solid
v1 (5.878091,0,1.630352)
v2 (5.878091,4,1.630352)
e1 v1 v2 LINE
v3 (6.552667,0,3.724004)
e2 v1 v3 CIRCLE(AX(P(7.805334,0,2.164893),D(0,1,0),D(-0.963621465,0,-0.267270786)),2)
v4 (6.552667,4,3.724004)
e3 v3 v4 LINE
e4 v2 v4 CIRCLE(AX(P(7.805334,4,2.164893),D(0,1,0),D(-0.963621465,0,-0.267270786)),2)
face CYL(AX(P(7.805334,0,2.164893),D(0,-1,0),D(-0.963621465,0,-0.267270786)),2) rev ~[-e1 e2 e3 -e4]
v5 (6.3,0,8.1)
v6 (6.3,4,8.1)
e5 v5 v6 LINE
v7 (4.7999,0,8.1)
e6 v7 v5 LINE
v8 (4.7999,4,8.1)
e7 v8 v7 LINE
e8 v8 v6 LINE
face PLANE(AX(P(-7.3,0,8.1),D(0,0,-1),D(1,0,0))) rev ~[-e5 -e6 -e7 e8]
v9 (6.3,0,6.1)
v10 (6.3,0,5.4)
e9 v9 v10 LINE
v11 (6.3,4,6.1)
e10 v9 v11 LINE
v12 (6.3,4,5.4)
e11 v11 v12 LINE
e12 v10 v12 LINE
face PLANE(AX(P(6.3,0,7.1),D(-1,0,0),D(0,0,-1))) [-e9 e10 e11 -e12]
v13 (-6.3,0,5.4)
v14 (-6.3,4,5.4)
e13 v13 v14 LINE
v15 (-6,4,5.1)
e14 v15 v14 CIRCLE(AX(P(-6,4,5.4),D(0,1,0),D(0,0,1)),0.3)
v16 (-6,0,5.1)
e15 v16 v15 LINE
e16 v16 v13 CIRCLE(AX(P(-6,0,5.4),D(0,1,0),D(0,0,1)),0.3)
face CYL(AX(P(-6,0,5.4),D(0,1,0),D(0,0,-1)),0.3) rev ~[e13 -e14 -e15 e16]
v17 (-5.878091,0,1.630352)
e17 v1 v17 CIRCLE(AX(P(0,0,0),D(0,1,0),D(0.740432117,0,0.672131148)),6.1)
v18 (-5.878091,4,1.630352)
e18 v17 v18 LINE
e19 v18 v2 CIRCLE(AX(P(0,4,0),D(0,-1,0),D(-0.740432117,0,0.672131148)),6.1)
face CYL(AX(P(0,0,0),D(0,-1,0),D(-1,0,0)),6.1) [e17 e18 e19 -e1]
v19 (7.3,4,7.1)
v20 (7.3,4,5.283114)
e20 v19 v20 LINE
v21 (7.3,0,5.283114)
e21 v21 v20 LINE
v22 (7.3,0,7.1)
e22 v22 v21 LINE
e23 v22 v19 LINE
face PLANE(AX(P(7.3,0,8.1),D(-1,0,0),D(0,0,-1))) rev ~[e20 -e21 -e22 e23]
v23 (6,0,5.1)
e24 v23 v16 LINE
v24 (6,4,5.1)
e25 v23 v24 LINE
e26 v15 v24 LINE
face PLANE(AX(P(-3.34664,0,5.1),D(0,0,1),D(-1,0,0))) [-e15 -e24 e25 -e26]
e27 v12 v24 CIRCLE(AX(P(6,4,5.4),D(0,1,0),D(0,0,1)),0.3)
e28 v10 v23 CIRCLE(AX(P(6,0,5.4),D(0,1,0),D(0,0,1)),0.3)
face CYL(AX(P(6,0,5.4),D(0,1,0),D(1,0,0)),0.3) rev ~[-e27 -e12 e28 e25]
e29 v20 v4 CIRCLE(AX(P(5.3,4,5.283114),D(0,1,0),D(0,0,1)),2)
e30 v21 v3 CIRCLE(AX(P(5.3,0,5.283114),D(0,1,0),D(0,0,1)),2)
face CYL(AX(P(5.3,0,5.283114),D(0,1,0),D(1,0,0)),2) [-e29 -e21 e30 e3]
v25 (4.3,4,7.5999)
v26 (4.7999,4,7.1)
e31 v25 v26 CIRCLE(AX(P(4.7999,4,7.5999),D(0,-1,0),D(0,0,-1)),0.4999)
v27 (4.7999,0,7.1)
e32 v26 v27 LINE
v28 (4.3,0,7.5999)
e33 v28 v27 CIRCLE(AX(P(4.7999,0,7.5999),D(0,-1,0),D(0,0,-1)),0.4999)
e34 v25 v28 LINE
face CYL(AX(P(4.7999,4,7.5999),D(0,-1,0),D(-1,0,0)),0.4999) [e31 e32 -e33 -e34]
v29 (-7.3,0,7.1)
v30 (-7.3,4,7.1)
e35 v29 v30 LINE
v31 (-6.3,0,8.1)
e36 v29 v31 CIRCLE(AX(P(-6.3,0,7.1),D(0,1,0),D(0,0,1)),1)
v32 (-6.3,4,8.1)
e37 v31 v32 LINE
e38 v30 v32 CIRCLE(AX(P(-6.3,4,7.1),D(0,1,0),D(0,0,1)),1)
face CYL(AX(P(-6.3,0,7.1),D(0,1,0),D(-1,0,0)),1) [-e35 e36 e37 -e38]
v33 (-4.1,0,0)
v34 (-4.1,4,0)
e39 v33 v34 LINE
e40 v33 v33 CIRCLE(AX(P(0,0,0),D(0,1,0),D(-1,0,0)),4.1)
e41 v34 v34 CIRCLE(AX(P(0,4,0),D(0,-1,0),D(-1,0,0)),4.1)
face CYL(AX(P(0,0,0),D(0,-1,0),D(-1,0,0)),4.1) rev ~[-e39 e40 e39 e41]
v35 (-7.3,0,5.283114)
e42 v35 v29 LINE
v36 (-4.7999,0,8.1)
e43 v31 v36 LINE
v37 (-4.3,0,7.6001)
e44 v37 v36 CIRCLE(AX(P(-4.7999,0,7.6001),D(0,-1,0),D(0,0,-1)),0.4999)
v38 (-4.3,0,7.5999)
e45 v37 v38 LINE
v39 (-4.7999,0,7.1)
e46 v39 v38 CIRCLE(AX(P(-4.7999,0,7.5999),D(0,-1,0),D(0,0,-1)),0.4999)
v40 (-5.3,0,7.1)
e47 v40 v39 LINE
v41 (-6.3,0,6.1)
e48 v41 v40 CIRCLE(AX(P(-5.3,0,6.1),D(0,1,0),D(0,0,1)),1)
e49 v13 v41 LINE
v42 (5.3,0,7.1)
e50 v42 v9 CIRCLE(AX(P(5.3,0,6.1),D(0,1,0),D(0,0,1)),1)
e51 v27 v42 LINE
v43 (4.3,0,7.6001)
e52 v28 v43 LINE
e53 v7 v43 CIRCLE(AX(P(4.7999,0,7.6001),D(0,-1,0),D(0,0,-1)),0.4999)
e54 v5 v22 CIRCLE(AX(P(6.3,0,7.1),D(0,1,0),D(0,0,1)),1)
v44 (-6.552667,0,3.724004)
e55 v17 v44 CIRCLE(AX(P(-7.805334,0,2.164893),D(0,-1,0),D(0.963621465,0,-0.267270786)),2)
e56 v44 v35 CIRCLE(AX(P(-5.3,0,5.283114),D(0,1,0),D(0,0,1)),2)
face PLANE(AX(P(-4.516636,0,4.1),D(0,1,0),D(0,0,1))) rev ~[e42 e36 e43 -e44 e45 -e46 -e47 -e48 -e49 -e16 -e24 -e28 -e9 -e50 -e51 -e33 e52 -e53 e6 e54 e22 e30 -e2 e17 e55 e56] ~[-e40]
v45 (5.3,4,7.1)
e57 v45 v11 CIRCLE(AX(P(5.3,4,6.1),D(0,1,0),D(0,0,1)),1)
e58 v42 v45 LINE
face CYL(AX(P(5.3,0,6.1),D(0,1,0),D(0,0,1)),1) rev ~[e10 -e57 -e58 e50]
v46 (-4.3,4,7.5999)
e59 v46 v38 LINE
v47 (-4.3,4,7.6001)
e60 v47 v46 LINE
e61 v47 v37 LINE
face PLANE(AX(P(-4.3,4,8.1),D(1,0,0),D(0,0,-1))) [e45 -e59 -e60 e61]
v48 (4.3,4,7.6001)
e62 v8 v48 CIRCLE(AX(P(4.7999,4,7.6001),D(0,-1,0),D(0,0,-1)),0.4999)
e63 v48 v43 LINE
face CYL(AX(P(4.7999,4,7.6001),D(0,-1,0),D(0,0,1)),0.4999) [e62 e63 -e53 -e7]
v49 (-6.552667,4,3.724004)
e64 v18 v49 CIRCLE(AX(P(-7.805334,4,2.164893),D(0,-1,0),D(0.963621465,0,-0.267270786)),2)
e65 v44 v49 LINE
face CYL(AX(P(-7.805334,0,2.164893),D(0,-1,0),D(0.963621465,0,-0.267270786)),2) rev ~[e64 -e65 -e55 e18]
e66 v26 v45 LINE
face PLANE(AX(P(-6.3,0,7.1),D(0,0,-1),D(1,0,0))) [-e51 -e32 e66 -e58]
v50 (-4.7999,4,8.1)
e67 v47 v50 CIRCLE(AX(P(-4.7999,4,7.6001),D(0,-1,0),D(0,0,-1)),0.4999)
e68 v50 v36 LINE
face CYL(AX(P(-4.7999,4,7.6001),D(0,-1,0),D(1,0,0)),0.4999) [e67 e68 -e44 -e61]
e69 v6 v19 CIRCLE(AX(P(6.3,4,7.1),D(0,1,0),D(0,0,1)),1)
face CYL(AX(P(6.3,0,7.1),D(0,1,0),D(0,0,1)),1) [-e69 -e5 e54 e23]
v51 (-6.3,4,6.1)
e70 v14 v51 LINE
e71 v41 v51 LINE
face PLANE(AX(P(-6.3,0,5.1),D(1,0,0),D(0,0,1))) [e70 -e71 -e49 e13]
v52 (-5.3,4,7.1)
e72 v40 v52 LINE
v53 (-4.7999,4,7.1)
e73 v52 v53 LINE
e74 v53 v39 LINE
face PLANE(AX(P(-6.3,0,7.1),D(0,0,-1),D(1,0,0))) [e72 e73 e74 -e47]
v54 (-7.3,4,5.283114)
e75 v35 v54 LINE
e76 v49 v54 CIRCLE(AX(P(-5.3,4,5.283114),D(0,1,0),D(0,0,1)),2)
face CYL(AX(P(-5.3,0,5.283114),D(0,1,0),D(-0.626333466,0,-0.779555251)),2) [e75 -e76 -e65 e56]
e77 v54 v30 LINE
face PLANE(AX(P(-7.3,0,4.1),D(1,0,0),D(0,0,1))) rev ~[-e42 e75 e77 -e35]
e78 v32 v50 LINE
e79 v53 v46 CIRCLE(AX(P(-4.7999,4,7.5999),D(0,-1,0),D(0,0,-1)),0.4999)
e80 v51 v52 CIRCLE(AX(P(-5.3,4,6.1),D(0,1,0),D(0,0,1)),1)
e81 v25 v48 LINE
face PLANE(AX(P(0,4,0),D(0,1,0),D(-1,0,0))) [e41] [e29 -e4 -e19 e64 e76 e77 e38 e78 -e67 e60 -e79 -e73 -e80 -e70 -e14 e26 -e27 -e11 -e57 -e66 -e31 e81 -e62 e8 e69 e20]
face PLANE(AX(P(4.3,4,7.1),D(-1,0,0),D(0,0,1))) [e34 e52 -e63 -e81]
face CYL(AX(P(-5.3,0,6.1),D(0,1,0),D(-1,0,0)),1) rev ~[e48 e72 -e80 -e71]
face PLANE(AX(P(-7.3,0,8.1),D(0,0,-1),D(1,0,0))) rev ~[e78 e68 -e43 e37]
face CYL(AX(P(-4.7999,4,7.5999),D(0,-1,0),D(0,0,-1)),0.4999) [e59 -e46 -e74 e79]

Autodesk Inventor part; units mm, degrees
ref_plane "YZ Plane" through (0, 0, 0) normal (1, 0, 0) x (0, 1, 0)
ref_plane "XZ Plane" through (0, 0, 0) normal (0, 1, 0) x (-1, 0, 0)
ref_plane "XY Plane" through (0, 0, 0) normal (0, 0, 1) x (1, 0, 0)
sketch "Sketch1" plane through (0, 0, 0) normal (0, 1, 0) x (-1, 0, 0)
  circle A0 centre (0, 0) radius 4.1
  line L0 (6.3, 7.1) -> (-6.3, 7.1)
  line L1 (-6.3, 7.1) -> (-6.3, 5.1)
  line L2 (-6.3, 5.1) -> (6.3, 5.1)
  line L3 (6.3, 5.1) -> (6.3, 7.1)
  line L4 (6.3, 7.1) -> (-6.3, 5.1) construction
  line L5 (-6.3, 7.1) -> (6.3, 5.1) construction
  circle A1 centre (0, 0) radius 6.1
  line L6 (7.3, 8.1) -> (-7.3, 8.1)
  line L7 (-7.3, 8.1) -> (-7.3, 4.1)
  line L8 (-7.3, 4.1) -> (7.3, 4.1)
  line L9 (7.3, 4.1) -> (7.3, 8.1)
  point P0 (0, 6.1)
  point P1 (0, 6.1)
  point P2 (-4.5166, 4.1)
  point P3 (4.5166, 4.1)
  dimension "d0" = 8.2
  dimension "d1" = 12.6
  dimension "d2" = 2
  dimension "d3" = 1
  dimension "d4" = 1
  dimension "d5" = 2
extrude "Extrusion1" add sketch "Sketch1" along normal blind 4 contours L8 A1 | L8 A1 L2 | L8 L7 L6 L9 A1 L2 L3 L0 L1
fillet "Fillet1" radius 2 2 edges at (-4.5166, 2, 4.1) (4.5166, 2, 4.1)
fillet "Fillet2" radius 2 2 edges at (-7.3, 2, 4.1) (7.3, 2, 4.1)
fillet "Fillet3" radius 1 2 edges at (-7.3, 2, 8.1) (7.3, 2, 8.1)
sketch "Sketch2" plane through (0, 4, 0) normal (0, 1, 0) x (1, 0, 0)
  line L0 (6.3, -7.1) -> (-6.3, -7.1) projected
  line L1 (-6.3, -8.1) -> (6.3, -8.1) projected
  line L2 (-4.3, -7.1) -> (4.3, -7.1)
  line L3 (4.3, -7.1) -> (4.3, -8.1)
  line L4 (4.3, -8.1) -> (-4.3, -8.1)
  line L5 (-4.3, -8.1) -> (-4.3, -7.1)
  line L6 (-6.3, -7.1) -> (-6.3, -5.1) projected
  line L7 (6.3, -5.1) -> (6.3, -7.1) projected
  point P0 (0, 0)
  point P1 (4.3, -7.1)
  dimension "d11" = 2
  dimension "d12" = 2
extrude "Extrusion2" cut sketch "Sketch2" against normal through all
fillet "Fillet4" radius 0.5 4 edges at (-4.3, 2, 7.1) (-4.3, 2, 8.1) (4.3, 2, 7.1) (4.3, 2, 8.1)
fillet "Fillet5" radius 1 2 edges at (-6.3, 2, 7.1) (6.3, 2, 7.1)
fillet "Fillet6" radius 0.3 2 edges at (-6.3, 2, 5.1) (6.3, 2, 5.1)
properties part number "clip_rod" material "ABS Plastic"
